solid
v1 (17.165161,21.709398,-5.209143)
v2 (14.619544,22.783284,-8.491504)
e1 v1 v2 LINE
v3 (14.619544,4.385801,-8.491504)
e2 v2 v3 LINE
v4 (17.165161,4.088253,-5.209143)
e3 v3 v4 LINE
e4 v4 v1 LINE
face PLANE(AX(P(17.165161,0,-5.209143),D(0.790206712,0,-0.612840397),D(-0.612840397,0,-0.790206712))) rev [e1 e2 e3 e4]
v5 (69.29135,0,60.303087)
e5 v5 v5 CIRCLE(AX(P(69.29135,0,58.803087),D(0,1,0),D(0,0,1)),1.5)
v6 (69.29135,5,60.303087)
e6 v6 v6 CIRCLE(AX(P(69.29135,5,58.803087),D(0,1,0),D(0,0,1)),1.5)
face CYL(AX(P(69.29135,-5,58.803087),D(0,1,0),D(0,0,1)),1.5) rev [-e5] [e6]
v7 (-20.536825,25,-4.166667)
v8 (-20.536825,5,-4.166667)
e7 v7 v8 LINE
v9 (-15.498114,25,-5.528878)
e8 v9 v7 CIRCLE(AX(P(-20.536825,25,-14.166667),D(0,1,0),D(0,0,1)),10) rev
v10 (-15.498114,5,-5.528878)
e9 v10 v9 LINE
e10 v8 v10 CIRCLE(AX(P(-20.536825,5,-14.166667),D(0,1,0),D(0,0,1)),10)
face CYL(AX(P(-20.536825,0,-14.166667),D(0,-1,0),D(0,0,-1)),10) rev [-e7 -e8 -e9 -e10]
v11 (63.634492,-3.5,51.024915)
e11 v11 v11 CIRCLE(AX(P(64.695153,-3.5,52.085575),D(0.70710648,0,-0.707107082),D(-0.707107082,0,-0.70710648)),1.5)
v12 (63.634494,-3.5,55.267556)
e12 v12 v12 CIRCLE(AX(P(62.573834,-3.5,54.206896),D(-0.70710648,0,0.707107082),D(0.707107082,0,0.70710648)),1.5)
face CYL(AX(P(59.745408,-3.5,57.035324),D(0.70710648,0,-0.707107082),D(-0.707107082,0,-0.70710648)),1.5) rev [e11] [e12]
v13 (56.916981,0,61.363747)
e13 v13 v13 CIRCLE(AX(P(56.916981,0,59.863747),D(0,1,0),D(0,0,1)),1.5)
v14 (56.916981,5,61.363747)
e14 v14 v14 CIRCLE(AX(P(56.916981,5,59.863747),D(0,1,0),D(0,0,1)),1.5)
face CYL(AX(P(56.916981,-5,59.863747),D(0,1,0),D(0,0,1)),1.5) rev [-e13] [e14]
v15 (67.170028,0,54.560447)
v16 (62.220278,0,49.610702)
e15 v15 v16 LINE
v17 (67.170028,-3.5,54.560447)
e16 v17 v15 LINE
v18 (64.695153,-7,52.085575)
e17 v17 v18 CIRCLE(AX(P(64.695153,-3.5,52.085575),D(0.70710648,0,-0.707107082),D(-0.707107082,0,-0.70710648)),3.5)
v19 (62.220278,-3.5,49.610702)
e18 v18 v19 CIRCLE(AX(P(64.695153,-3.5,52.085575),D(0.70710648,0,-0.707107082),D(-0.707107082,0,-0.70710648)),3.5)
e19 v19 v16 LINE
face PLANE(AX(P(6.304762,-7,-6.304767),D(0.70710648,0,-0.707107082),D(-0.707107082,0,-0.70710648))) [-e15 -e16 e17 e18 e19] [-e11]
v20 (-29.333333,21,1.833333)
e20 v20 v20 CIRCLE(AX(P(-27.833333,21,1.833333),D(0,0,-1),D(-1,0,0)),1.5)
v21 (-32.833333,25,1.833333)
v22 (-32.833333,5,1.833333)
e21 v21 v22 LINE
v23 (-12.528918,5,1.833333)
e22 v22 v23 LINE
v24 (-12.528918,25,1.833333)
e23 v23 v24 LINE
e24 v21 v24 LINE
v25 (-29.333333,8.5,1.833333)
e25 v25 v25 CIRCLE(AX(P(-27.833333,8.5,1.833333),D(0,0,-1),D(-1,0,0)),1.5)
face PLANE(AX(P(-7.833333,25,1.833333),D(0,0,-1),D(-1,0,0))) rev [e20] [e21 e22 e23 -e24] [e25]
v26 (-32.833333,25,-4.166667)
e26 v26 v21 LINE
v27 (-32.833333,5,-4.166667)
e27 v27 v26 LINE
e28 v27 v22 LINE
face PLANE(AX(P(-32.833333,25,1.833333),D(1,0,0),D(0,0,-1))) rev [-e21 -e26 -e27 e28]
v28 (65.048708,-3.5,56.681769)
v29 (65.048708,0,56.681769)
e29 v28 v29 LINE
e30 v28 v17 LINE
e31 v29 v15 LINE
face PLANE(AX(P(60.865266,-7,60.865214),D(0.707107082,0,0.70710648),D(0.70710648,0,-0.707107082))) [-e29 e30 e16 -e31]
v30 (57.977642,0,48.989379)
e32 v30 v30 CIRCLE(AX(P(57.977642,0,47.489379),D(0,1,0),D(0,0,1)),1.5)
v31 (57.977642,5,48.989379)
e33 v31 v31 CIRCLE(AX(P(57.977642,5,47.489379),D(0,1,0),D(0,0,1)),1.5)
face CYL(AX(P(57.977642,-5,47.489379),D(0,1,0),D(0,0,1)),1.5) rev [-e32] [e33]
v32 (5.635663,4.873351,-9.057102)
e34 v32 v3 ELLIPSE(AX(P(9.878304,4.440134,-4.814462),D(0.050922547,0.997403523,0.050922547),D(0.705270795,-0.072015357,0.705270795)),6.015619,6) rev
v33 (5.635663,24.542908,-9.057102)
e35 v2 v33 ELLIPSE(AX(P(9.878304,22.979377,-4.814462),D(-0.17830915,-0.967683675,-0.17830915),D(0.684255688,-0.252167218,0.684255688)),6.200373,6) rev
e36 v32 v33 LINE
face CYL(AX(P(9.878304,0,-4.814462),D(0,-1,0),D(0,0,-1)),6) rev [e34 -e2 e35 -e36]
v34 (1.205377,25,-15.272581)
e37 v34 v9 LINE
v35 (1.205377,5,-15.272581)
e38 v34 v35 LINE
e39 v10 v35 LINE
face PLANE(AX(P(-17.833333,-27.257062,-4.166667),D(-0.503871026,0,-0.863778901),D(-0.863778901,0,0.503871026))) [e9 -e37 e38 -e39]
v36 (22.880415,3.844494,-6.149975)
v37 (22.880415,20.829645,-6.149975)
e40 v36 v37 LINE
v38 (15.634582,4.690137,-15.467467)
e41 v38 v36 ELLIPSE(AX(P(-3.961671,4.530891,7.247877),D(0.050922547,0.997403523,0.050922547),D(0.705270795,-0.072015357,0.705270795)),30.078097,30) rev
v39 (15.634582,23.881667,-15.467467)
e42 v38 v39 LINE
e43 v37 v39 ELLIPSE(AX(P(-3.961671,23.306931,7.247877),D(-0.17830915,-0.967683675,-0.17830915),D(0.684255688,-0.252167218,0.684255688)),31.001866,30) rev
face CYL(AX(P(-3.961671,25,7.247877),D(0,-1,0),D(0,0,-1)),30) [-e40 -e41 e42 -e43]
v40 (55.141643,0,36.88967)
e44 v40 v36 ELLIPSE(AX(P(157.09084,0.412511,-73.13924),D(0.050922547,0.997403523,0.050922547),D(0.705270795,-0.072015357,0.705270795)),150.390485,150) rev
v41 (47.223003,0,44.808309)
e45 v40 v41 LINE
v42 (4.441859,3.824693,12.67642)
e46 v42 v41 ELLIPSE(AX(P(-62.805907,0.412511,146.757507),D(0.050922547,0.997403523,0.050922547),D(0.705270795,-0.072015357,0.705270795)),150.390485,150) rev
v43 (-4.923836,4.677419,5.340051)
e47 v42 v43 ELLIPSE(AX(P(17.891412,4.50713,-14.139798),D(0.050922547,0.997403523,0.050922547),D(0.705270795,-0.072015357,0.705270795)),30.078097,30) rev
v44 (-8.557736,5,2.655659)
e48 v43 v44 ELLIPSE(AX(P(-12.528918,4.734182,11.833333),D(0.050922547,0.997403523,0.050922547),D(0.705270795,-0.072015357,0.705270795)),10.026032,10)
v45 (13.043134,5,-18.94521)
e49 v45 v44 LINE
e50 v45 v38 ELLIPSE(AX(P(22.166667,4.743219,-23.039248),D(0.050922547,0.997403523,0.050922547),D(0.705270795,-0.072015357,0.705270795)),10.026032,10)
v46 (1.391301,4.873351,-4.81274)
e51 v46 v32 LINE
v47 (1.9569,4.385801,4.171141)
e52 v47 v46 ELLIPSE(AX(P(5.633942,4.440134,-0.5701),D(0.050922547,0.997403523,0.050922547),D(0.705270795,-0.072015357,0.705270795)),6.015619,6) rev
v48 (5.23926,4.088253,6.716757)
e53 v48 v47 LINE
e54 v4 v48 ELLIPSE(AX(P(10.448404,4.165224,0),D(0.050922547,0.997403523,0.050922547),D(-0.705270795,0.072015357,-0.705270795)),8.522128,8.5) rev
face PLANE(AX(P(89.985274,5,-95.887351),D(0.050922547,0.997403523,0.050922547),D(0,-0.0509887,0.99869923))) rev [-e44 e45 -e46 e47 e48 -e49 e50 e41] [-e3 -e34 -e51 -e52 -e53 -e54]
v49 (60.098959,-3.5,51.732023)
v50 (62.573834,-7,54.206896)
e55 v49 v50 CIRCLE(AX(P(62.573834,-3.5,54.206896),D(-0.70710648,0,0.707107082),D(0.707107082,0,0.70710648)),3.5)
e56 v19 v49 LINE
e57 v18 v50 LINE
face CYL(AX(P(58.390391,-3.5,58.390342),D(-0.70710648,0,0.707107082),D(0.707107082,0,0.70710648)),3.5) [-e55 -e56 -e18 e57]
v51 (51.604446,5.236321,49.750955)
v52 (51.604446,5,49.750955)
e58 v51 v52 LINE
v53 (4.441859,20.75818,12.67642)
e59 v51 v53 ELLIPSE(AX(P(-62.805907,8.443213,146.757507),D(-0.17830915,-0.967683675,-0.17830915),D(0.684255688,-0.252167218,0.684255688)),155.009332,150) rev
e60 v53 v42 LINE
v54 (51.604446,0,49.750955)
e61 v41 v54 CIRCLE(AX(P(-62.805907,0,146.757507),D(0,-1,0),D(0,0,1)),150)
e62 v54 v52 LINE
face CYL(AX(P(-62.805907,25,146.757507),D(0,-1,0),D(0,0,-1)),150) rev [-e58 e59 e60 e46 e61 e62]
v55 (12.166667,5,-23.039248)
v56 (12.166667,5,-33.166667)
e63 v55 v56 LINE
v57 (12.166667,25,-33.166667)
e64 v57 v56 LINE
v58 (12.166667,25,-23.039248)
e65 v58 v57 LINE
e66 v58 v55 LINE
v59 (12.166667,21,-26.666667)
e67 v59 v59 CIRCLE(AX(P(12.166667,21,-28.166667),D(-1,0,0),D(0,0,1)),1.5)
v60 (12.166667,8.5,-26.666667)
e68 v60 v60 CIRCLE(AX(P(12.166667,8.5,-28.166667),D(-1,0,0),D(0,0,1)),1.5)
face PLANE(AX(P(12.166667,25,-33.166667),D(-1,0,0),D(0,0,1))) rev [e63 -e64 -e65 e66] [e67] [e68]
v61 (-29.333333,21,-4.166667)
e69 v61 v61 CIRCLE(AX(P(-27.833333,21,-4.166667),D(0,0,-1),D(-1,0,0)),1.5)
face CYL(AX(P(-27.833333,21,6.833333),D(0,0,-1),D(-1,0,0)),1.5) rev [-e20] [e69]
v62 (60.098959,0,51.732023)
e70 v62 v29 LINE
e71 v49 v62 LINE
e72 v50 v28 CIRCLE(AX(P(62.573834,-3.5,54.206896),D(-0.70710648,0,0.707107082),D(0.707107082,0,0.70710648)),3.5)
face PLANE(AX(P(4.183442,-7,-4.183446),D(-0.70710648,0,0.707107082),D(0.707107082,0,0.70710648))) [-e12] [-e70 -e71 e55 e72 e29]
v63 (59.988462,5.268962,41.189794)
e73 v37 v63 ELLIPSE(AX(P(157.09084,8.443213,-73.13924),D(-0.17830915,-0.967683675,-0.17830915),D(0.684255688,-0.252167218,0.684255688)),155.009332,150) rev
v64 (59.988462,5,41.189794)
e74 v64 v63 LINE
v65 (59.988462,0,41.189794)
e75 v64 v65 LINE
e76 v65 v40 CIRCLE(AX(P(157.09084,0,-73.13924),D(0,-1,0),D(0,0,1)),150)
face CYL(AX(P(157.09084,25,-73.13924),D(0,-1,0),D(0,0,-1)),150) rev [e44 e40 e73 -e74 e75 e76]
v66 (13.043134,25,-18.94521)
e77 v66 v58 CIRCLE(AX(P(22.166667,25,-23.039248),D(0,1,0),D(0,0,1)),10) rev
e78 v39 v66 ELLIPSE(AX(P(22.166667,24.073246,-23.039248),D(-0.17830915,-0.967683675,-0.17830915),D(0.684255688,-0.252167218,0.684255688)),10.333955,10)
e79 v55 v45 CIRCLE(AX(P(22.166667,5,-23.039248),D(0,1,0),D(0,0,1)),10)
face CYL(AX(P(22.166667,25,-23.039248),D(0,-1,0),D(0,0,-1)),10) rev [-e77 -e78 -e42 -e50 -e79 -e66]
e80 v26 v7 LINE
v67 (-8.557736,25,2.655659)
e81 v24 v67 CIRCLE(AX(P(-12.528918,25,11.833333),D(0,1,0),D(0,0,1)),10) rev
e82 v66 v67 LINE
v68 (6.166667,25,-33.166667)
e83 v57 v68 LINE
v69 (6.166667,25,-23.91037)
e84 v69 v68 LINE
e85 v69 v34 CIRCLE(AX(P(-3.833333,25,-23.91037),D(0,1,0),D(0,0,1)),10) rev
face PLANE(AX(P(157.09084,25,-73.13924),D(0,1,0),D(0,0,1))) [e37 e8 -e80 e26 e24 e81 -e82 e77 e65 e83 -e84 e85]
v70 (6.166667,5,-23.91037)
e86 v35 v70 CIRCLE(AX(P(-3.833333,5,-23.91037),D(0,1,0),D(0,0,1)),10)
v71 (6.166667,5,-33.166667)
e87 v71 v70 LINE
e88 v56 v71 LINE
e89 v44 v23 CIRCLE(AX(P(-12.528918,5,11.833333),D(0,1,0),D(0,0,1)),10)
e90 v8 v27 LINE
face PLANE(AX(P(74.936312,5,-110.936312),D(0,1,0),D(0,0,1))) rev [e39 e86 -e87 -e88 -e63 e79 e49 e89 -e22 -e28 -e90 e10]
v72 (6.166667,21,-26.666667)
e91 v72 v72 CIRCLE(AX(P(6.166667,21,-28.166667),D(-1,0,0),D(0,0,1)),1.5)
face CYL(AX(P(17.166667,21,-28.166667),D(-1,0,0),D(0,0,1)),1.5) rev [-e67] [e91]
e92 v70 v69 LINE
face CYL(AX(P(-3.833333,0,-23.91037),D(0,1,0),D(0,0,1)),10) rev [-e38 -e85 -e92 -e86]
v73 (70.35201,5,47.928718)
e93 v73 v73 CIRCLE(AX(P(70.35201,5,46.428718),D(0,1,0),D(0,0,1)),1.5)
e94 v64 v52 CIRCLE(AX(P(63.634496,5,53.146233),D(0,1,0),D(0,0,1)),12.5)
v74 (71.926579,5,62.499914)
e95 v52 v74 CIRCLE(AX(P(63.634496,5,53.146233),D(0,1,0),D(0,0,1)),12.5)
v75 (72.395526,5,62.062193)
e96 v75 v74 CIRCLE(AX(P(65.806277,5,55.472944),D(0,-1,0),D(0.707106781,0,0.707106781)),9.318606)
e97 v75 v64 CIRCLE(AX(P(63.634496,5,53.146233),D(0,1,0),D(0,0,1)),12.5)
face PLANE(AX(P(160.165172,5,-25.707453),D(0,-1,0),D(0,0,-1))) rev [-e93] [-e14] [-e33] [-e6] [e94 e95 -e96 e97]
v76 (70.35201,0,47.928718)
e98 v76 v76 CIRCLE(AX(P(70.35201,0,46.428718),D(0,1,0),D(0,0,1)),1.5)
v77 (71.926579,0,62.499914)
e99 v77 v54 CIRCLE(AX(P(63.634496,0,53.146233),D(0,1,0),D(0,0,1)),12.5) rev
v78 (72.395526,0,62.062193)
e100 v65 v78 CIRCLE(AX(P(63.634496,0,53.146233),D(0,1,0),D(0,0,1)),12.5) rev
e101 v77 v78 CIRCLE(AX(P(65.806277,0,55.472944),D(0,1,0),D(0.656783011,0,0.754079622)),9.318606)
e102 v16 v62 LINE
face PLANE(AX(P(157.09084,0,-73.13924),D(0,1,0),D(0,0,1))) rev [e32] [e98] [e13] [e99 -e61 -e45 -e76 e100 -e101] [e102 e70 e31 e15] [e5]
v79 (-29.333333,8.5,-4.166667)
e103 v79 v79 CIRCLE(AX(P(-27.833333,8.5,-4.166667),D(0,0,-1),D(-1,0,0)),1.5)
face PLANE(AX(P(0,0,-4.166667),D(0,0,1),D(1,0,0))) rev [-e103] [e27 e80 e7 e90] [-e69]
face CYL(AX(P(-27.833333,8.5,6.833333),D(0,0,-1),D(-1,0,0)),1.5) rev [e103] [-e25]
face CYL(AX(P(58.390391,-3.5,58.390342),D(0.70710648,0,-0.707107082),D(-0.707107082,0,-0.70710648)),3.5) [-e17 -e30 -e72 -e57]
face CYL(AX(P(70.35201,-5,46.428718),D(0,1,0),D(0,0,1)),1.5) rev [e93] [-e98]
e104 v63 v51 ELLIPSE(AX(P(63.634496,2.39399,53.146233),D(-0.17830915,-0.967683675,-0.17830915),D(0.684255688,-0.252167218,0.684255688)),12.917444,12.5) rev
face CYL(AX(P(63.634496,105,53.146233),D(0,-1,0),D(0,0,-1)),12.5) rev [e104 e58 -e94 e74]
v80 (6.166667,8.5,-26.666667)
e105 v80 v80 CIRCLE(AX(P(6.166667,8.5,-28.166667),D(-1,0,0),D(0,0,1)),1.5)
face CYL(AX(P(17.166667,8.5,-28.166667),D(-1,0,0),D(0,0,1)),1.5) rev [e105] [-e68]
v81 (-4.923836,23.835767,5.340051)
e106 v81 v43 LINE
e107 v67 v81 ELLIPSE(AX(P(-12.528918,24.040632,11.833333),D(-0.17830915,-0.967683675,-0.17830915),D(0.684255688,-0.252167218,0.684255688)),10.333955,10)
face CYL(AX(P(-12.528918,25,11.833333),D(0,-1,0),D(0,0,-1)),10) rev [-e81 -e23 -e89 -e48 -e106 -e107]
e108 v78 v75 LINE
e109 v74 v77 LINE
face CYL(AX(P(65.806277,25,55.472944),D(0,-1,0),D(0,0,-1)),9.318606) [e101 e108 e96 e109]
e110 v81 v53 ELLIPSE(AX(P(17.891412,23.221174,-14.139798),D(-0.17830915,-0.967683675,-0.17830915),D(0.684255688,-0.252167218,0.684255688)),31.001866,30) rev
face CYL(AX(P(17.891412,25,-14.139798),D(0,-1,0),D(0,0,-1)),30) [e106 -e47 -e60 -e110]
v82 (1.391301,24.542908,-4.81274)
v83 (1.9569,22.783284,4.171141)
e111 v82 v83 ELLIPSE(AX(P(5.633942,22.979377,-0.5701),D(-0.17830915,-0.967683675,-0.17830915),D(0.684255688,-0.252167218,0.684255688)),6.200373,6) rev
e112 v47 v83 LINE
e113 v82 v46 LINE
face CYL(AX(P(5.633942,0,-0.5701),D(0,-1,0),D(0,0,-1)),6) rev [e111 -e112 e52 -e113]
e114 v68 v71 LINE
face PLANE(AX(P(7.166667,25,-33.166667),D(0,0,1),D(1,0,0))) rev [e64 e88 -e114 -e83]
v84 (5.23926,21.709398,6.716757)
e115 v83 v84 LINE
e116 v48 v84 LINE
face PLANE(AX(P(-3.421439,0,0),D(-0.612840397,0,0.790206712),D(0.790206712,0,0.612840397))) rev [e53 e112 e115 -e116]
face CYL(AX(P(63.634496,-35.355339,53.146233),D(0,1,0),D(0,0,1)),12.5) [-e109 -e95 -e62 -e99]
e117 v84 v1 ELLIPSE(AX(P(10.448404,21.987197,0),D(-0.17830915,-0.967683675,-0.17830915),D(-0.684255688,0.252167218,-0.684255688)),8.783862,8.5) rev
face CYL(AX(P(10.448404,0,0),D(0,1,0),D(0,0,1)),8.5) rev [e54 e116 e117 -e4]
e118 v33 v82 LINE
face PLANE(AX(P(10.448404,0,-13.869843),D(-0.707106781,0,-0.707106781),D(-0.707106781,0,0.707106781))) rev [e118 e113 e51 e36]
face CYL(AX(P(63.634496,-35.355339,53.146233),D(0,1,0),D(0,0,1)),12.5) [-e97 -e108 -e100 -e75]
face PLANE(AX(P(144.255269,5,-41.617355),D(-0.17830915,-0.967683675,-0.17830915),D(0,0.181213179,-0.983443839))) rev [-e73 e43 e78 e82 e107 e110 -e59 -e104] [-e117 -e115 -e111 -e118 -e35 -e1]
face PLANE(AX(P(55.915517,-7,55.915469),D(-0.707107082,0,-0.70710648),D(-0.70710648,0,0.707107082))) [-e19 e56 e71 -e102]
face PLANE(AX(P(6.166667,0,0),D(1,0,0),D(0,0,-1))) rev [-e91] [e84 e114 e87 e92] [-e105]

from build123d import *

# Parameters (mm, degrees)
BOSS_EXTRUDE3_DEPTH     = 25
FILLET2_R               = 30
CUT_EXTRUDE4_DEPTH      = 25
FILLET3_R               = 6
BOSS_EXTRUDE4_DEPTH     = 25
CUT_EXTRUDE6_DEPTH      = 100
CUT_EXTRUDE6_DEPTH_BACK = 100
SKETCH10_W              = 160.183879056
SKETCH10_H              = 83.114276869
SKETCH11_R              = 12.5
BOSS_EXTRUDE5_DEPTH     = 5
CUT_EXTRUDE7_START      = 100
SKETCH12_R              = 12.5
CUT_EXTRUDE7_DEPTH      = 100
SKETCH14_R              = 1.5
CUT_EXTRUDE8_DEPTH      = 10
SKETCH15_R              = 1.5
CUT_EXTRUDE9_DEPTH      = 10
FILLET6_R               = 10
SKETCH16_R              = 1.5
CUT_EXTRUDE10_DEPTH     = 10
BOSS_EXTRUDE7_DEPTH     = 7
SKETCH19_R              = 1.5
CUT_EXTRUDE12_DEPTH     = 7
FILLET7_R               = 3.5
BOSS_EXTRUDE8_START     = 1
SKETCH20_W              = 15
SKETCH20_H              = 20
SKETCH20_R              = 1.5
BOSS_EXTRUDE8_DEPTH     = 1
BOSS_EXTRUDE9_START     = 1
SKETCH21_W              = 15
SKETCH21_H              = 20
SKETCH21_R              = 1.5
BOSS_EXTRUDE9_DEPTH     = 1
BOSS_EXTRUDE10_DEPTH    = 20
FILLET8_R               = 10


# Some blends are built 0.0001 mm under size
with BuildPart() as part:
    # Sketch1 → Boss-Extrude3 (new body)
    with BuildSketch(Plane(origin=(0, 0, 0), x_dir=(1, 0, 0), z_dir=(0, 1, 0))):
        with BuildLine():
            Line((-32.833333333, 3.166666667), (-17.833333333, 3.166666667))
            Line((-17.833333333, 3.166666667), (7.166666667, 18.166666667))
            Line((7.166666667, 18.166666667), (7.166666667, 33.166666667))
            Line((7.166666667, 33.166666667), (12.166666667, 33.166666667))
            Line((12.166666667, 33.166666667), (12.166666667, 18.166666667))
            Line((12.166666667, 18.166666667), (17.527177031, 18.166666667))
            ThreePointArc((17.527177031, 18.166666667), (37.442198793, -17.327342211), (66.165661867, -46.161270611))
            ThreePointArc((66.165661867, -46.161270611), (72.395526252, -62.062192918), (56.494603945, -55.832328533))
            ThreePointArc((56.494603945, -55.832328533), (27.660675544, -27.10886546), (-7.833333333, -7.193843698))
            Line((-7.833333333, -7.193843698), (-7.833333333, -1.833333333))
            Line((-7.833333333, -1.833333333), (-32.833333333, -1.833333333))
            Line((-32.833333333, -1.833333333), (-32.833333333, 3.166666667))
        make_face()
    extrude(amount=BOSS_EXTRUDE3_DEPTH)

    # Chamfer2
    # the kernel refuses this chamfer: 6, 5.627229018 mm, written as the material it takes off along each edge
    with BuildSketch(Plane(origin=(17.527177031, -14.820831596, -18.166666667), x_dir=(-0.9997164223008481, 0, -0.023813336221376217), z_dir=(0, 1, 0))) as chamfer2_piece_1_section:
        with BuildLine():
            Line((5.702702936, 0), (-2.525905891, 5.363294445))
            Line((-2.525905891, 5.363294445), (-2.634618021, 5.31248428))
            ThreePointArc((-2.634618021, 5.31248428), (-1.288030314, 2.670484416), (-0.110572005, -0.046624369))
            Line((-0.110572005, -0.046624369), (0.0028576, -0.119965971))
            ThreePointArc((0.0028576, -0.119965971), (2.852592138, -0.052085034), (5.705560536, -0.119965971))
            Line((5.705560536, -0.119965971), (5.702702936, 0))
        make_face()
    chamfer2_piece_1 = extrude(amount=54.641663192, mode=Mode.PRIVATE)
    chamfer2_piece_1 = split(chamfer2_piece_1, bisect_by=Plane(origin=(12.166666667, 12.5, -16.425975933), z_dir=(1, 0, 0)), keep=Keep.TOP, mode=Mode.PRIVATE)
    add(chamfer2_piece_1, mode=Mode.SUBTRACT)
    with BuildSketch(Plane(origin=(-7.833333333, -15.240510768, 7.193843698), x_dir=(-0.020819858729133396, 0, -0.999783243249505), z_dir=(0, 1, 0))) as chamfer2_piece_2_section:
        with BuildLine():
            Line((6.096204307, 0), (-2.361428154, -5.028621182))
            Line((-2.361428154, -5.028621182), (-2.470415157, -4.978403325))
            ThreePointArc((-2.470415157, -4.978403325), (-1.204815622, -2.503704319), (-0.110711113, 0.046293083))
            Line((-0.110711113, 0.046293083), (0.002498383, 0.119973989))
            ThreePointArc((0.002498383, 0.119973989), (3.049279286, 0.056526689), (6.09870269, 0.119973989))
            Line((6.09870269, 0.119973989), (6.096204307, 0))
        make_face()
    chamfer2_piece_2 = extrude(amount=55.481021536, mode=Mode.PRIVATE)
    chamfer2_piece_2 = split(chamfer2_piece_2, bisect_by=Plane(origin=(-6.193350631, 12.5, 1.833333333), z_dir=(0, 0, 1)), keep=Keep.TOP, mode=Mode.PRIVATE)
    add(chamfer2_piece_2, mode=Mode.SUBTRACT)

    # Fillet2
    # the kernel refuses this fillet: 30 mm, written as the material it takes off along each edge
    with BuildSketch(Plane(origin=(19.726764246, 45.355475944, -12.880543269), x_dir=(0.42429011681478046, 0, 0.9055263092662189), z_dir=(0, -1, 0))) as fillet2_piece_1:
        with BuildLine():
            CenterArc((8.176045785, 29.990790911), FILLET2_R, 239.5660286, 29.014271836)
            Line((-7.020306331, 4.124386399), (0, 0))
            ThreePointArc((0, 0), (3.716384448, 0.046045445), (7.432768895, 0))
        make_face()
    extrude(amount=65.710951888, mode=Mode.SUBTRACT)
    with BuildSketch(Plane(origin=(-2.883559651, 47.152983024, 9.246371963), x_dir=(0.9056360428972143, 0, 0.4240558427913414), z_dir=(0, -1, 0))) as fillet2_piece_2_section:
        with BuildLine():
            CenterArc((8.898038247, -29.989092358), FILLET2_R, 91.545096469, 31.436731661)
            Line((-7.433152225, -4.823794471), (0, 0))
            ThreePointArc((0, 0), (4.044562839, -0.05453821), (8.089125679, 0))
        make_face()
    fillet2_piece_2 = extrude(amount=69.305966049, mode=Mode.PRIVATE)
    fillet2_piece_2 = split(fillet2_piece_2, bisect_by=Plane(origin=(-2.472074329, 12.5, 1.833333333), z_dir=(0, 0, 1)), keep=Keep.TOP, mode=Mode.PRIVATE)
    add(fillet2_piece_2, mode=Mode.SUBTRACT)

    # Sketch4 → Cut-Extrude4 (cut)
    with BuildSketch(Plane(origin=(0, 25, 0), x_dir=(1, 0, 0), z_dir=(0, 1, 0))):
        with BuildLine():
            Line((17.165160832, 5.209143376), (10.448403781, 13.869842848))
            Line((10.448403781, 13.869842848), (-3.421439067, 0))
            Line((-3.421439067, 0), (5.239260404, -6.716757051))
            ThreePointArc((5.239260404, -6.716757051), (16.458811421, -6.01040764), (17.165160832, 5.209143376))
        make_face()
    extrude(amount=-CUT_EXTRUDE4_DEPTH, mode=Mode.SUBTRACT)

    # Fillet3
    fillet3_edges = [part.edges().sort_by_distance(p)[0] for p in [
        (-3.421439067, 12.5, 0),
        (10.448403781, 12.5, -13.869842848),
    ]]
    fillet(fillet3_edges, radius=FILLET3_R)

    # Sketch7 → Boss-Extrude4 (add)
    with BuildSketch(Plane(origin=(0, 25, 0), x_dir=(1, 0, 0), z_dir=(0, 1, 0))):
        Polygon((8.953526914, 27.464178608), (42.758807377, -6.341101855), (46.775588972, -2.324320261), (12.970308509, 31.480960203), align=None)
    extrude(amount=BOSS_EXTRUDE4_DEPTH)

    # Sketch10 → Cut-Extrude6 (cut, two sides: drawn at the far end of the back side and taken through both)
    with BuildSketch(Plane(origin=(22.225634356, 0, -22.225634356), x_dir=(-0.7071067811865475, 0, -0.7071067811865477), z_dir=(0.7071067811865477, 0, -0.7071067811865475)).offset(-CUT_EXTRUDE6_DEPTH_BACK)):
        with Locations((-36.711585848, 10.87638512)):
            Rectangle(SKETCH10_W, SKETCH10_H)
        Polygon((-95.075965008, 0), (-95.075965008, 5), (-72.575965008, 5), (4.173398499, 25), (18.384776311, 25), (25.455844123, 25), (25.455844123, 5), (18.384776311, 5), (4.173398499, 5), (-65.075965008, 0), align=None, mode=Mode.SUBTRACT)
    extrude(amount=CUT_EXTRUDE6_DEPTH + CUT_EXTRUDE6_DEPTH_BACK, mode=Mode.SUBTRACT)

    # Sketch11 → Boss-Extrude5 (add)
    with BuildSketch(Plane(origin=(0, 5, 0), x_dir=(1, 0, 0), z_dir=(0, 1, 0))):
        with Locations((63.634495769, -53.146232797)):
            Circle(SKETCH11_R)
    extrude(amount=-BOSS_EXTRUDE5_DEPTH)

    # Sketch12 → Cut-Extrude7 (cut)
    with BuildSketch(Plane(origin=(0, 5, 0), x_dir=(1, 0, 0), z_dir=(0, 1, 0)).offset(CUT_EXTRUDE7_START)):
        with Locations((63.634495769, -53.146232797)):
            Circle(SKETCH12_R)
    extrude(amount=-CUT_EXTRUDE7_DEPTH, mode=Mode.SUBTRACT)

    # Sketch14 → Cut-Extrude8 (cut)
    with BuildSketch(Plane.ZY.offset(-7.166666667)):
        with Locations((-28.166666667, 21)):
            Circle(SKETCH14_R)
        with Locations((-28.166666667, 8.5)):
            Circle(SKETCH14_R)
    extrude(amount=-CUT_EXTRUDE8_DEPTH, mode=Mode.SUBTRACT)

    # Sketch15 → Cut-Extrude9 (cut)
    with BuildSketch(Plane(origin=(0, 0, -3.166666667), x_dir=(-1, 0, 0), z_dir=(0, 0, -1))):
        with Locations((27.833333333, 21)):
            Circle(SKETCH15_R)
        with Locations((27.833333333, 8.5)):
            Circle(SKETCH15_R)
    extrude(amount=-CUT_EXTRUDE9_DEPTH, mode=Mode.SUBTRACT)

    # Fillet6
    # the kernel refuses this fillet: 10 mm, written as the material it adds along each edge
    with BuildSketch(Plane(origin=(-7.502347281, -7.577664342, 1.833333333), x_dir=(0.5924373658705074, 0, 0.8056165139322894), z_dir=(0, 1, 0))) as fillet6_piece_1_section:
        with BuildLine():
            CenterArc((5.078393583, -9.973648871), FILLET6_R, 94.160376696, 49.509460781)
            Line((-2.977771557, -4.049275213), (0, 0))
            ThreePointArc((0, 0), (2.176454393, -0.079053386), (4.352908785, 0))
        make_face()
    fillet6_piece_1 = extrude(amount=45.100484579, mode=Mode.PRIVATE)
    fillet6_piece_1 = split(fillet6_piece_1, bisect_by=Plane(origin=(-10.464404815, 5.138408988, 1.851355811), z_dir=(-0.05092254709852862, -0.9974035233515051, -0.05092254709852862)), keep=Keep.TOP, mode=Mode.PRIVATE)
    fillet6_piece_1 = split(fillet6_piece_1, bisect_by=Plane(origin=(-10.467928872, 5, 1.847831753), z_dir=(0, 1, 0)), keep=Keep.TOP, mode=Mode.PRIVATE)
    add(fillet6_piece_1)
    with BuildSketch(Plane(origin=(-7.502347281, -7.577664342, 1.833333333), x_dir=(0.5924373658705074, 0, 0.8056165139322894), z_dir=(0, 1, 0))) as fillet6_piece_2_section:
        with BuildLine():
            CenterArc((5.078393583, -9.973648871), FILLET6_R, 94.160376696, 49.509460781)
            Line((-2.977771557, -4.049275213), (0, 0))
            ThreePointArc((0, 0), (2.176454393, -0.079053386), (4.352908785, 0))
        make_face()
    fillet6_piece_2 = extrude(amount=45.100484579, mode=Mode.PRIVATE)
    fillet6_piece_2 = split(fillet6_piece_2, bisect_by=Plane(origin=(-6.303814001, 4.830696636, 3.717827688), z_dir=(0.05092254709852862, 0.9974035233515051, 0.05092254709852862)), keep=Keep.TOP, mode=Mode.PRIVATE)
    fillet6_piece_2 = split(fillet6_piece_2, bisect_by=Plane(origin=(-6.299503336, 5, 3.722138352), z_dir=(0, -1, 0)), keep=Keep.TOP, mode=Mode.PRIVATE)
    add(fillet6_piece_2)
    with BuildSketch(Plane(origin=(-7.502347281, -7.577664342, 1.833333333), x_dir=(0.5924373658705074, 0, 0.8056165139322894), z_dir=(0, 1, 0))) as fillet6_piece_3_section:
        with BuildLine():
            CenterArc((5.078393583, -9.973648871), FILLET6_R, 94.160376696, 49.509460781)
            Line((-2.977771557, -4.049275213), (0, 0))
            ThreePointArc((0, 0), (2.176454393, -0.079053386), (4.352908785, 0))
        make_face()
    fillet6_piece_3 = extrude(amount=45.100484579, mode=Mode.PRIVATE)
    fillet6_piece_3 = split(fillet6_piece_3, bisect_by=Plane(origin=(-8.64759618, 5.034829767, 2.063320006), z_dir=(0.05092254709852862, 0.9974035233515051, 0.05092254709852862)), keep=Keep.TOP, mode=Mode.PRIVATE)
    fillet6_piece_3 = split(fillet6_piece_3, bisect_by=Plane(origin=(-6.413698514, 24.302451402, 4.297217673), z_dir=(-0.17830914996233782, -0.9676836745958967, -0.17830914996233793)), keep=Keep.TOP, mode=Mode.PRIVATE)
    fillet6_piece_3 = split(fillet6_piece_3, bisect_by=Plane(origin=(-8.143046579, 5, 2.567869607), z_dir=(0, 1, 0)), keep=Keep.TOP, mode=Mode.PRIVATE)
    fillet6_piece_3 = split(fillet6_piece_3, bisect_by=Plane(origin=(-8.143046579, 25, 2.567869607), z_dir=(0, -1, 0)), keep=Keep.TOP, mode=Mode.PRIVATE)
    add(fillet6_piece_3)
    with BuildSketch(Plane(origin=(12.166666667, 25, -18.068743425), x_dir=(0.7999623849439977, 0, 0.6000501501330627), z_dir=(0, -1, 0))) as fillet6_piece_4_section:
        with BuildLine():
            CenterArc((5.017071581, -9.976718531), FILLET6_R, 93.910453362, 49.216057169)
            Line((-2.982552268, -3.97621703), (-3.782514653, -3.37616688))
            Line((-3.782514653, -3.37616688), (-0.799962385, 0.60005015))
            Line((-0.799962385, 0.60005015), (0.042105821, 0.999113157))
            ThreePointArc((0.042105821, 0.999113157), (1.068110264, 0.955874051), (4.266901142, 0.997671853))
            Line((4.266901142, 0.997671853), (4.335098455, 0))
        make_face()
    fillet6_piece_4 = extrude(amount=20, mode=Mode.PRIVATE)
    fillet6_piece_4 = split(fillet6_piece_4, bisect_by=Plane(origin=(12.113566037, 5.056431477, -19.120947952), z_dir=(0.05092254709852862, 0.9974035233515051, 0.05092254709852862)), keep=Keep.TOP, mode=Mode.PRIVATE)
    fillet6_piece_4 = split(fillet6_piece_4, bisect_by=Plane(origin=(14.359334309, 24.376039861, -16.875179681), z_dir=(-0.17830914996233782, -0.9676836745958967, -0.17830914996233793)), keep=Keep.TOP, mode=Mode.PRIVATE)
    add(fillet6_piece_4)
    with BuildSketch(Plane(origin=(12.166666667, 25, -18.068743425), x_dir=(0.7999623849439977, 0, 0.6000501501330627), z_dir=(0, -1, 0))) as fillet6_piece_5_section:
        with BuildLine():
            CenterArc((5.017071581, -9.976718531), FILLET6_R, 93.910453362, 49.216057169)
            Line((-2.982552268, -3.97621703), (-3.782514653, -3.37616688))
            Line((-3.782514653, -3.37616688), (-0.799962385, 0.60005015))
            Line((-0.799962385, 0.60005015), (0.042105821, 0.999113157))
            ThreePointArc((0.042105821, 0.999113157), (1.068110264, 0.955874051), (4.266901142, 0.997671853))
            Line((4.266901142, 0.997671853), (4.335098455, 0))
        make_face()
    fillet6_piece_5 = extrude(amount=20, mode=Mode.PRIVATE)
    fillet6_piece_5 = split(fillet6_piece_5, bisect_by=Plane(origin=(11.727300312, 5.177477113, -21.105564102), z_dir=(-0.05092254709852862, -0.9974035233515051, -0.05092254709852862)), keep=Keep.TOP, mode=Mode.PRIVATE)
    add(fillet6_piece_5)
    with BuildSketch(Plane(origin=(12.166666667, 25, -18.068743425), x_dir=(0.7999623849439977, 0, 0.6000501501330627), z_dir=(0, -1, 0))) as fillet6_piece_6_section:
        with BuildLine():
            CenterArc((5.017071581, -9.976718531), FILLET6_R, 93.910453362, 49.216057169)
            Line((-2.982552268, -3.97621703), (-3.782514653, -3.37616688))
            Line((-3.782514653, -3.37616688), (-0.799962385, 0.60005015))
            Line((-0.799962385, 0.60005015), (0.042105821, 0.999113157))
            ThreePointArc((0.042105821, 0.999113157), (1.068110264, 0.955874051), (4.266901142, 0.997671853))
            Line((4.266901142, 0.997671853), (4.335098455, 0))
        make_face()
    fillet6_piece_6 = extrude(amount=32.426262487, mode=Mode.PRIVATE)
    fillet6_piece_6 = split(fillet6_piece_6, bisect_by=Plane(origin=(14.095782292, 4.806456237, -16.206979714), z_dir=(0.05092254709852862, 0.9974035233515051, 0.05092254709852862)), keep=Keep.TOP, mode=Mode.PRIVATE)
    fillet6_piece_6 = split(fillet6_piece_6, bisect_by=Plane(origin=(14.100710146, 5, -16.20205186), z_dir=(0, -1, 0)), keep=Keep.TOP, mode=Mode.PRIVATE)
    add(fillet6_piece_6)

    # Sketch16 → Cut-Extrude10 (cut)
    with BuildSketch(Plane(origin=(0, 5, 0), x_dir=(1, 0, 0), z_dir=(0, 1, 0))):
        with Locations(Location((70.35201019, -46.428718376, 0), (0, 0, 270))):
            Circle(SKETCH16_R)
        with Locations(Location((57.97764152, -47.489378547, 0), (0, 0, 270))):
            Circle(SKETCH16_R)
        with Locations(Location((56.916981348, -59.863747218, 0), (0, 0, 270))):
            Circle(SKETCH16_R)
        with Locations(Location((69.291350019, -58.803087046, 0), (0, 0, 270))):
            Circle(SKETCH16_R)
    extrude(amount=-CUT_EXTRUDE10_DEPTH, mode=Mode.SUBTRACT)

    # Sketch17 → Boss-Extrude7 (add)
    with BuildSketch(Plane.XZ):
        Polygon((65.048708428, 56.68176851), (67.170027868, 54.560447263), (62.220278291, 49.610701903), (60.098958851, 51.73202315), align=None)
    extrude(amount=BOSS_EXTRUDE7_DEPTH)

    # Sketch19 → Cut-Extrude12 (cut)
    with BuildSketch(Plane(origin=(6.304761689, 0, -6.304767061), x_dir=(-0.7071070824005901, 0, -0.7071064799723766), z_dir=(0.7071064799723766, 0, -0.7071070824005901))):
        with Locations((-82.57644824, -3.5)):
            Circle(SKETCH19_R)
    extrude(amount=-CUT_EXTRUDE12_DEPTH, mode=Mode.SUBTRACT)

    # Fillet7
    fillet7_edges = [part.edges().sort_by_distance(p)[0] for p in [
        (61.159618571, -7, 50.671362527),
        (66.109368148, -7, 55.621107886),
    ]]
    fillet(fillet7_edges, radius=FILLET7_R - 0.0001)  # a hair under: the kernel refuses the full size

    # Sketch20 → Boss-Extrude8 (add)
    with BuildSketch(Plane.ZY.offset(-7.166666667).offset(BOSS_EXTRUDE8_START)):
        with Locations((-25.666666667, 15)):
            Rectangle(SKETCH20_W, SKETCH20_H)
        with Locations((-28.166666667, 21)):
            Circle(SKETCH20_R, mode=Mode.SUBTRACT)
        with Locations((-28.166666667, 8.5)):
            Circle(SKETCH20_R, mode=Mode.SUBTRACT)
    extrude(amount=-BOSS_EXTRUDE8_DEPTH)

    # Sketch21 → Boss-Extrude9 (add)
    with BuildSketch(Plane(origin=(0, 0, -3.166666667), x_dir=(-1, 0, 0), z_dir=(0, 0, -1)).offset(BOSS_EXTRUDE9_START)):
        with Locations((25.333333333, 15)):
            Rectangle(SKETCH21_W, SKETCH21_H)
        with Locations((27.833333333, 21)):
            Circle(SKETCH21_R, mode=Mode.SUBTRACT)
        with Locations((27.833333333, 8.5)):
            Circle(SKETCH21_R, mode=Mode.SUBTRACT)
    extrude(amount=-BOSS_EXTRUDE9_DEPTH)

    # Sketch22 → Boss-Extrude10 (add)
    with BuildSketch(Plane(origin=(0, 25, 0), x_dir=(1, 0, 0), z_dir=(0, 1, 0))):
        Polygon((-17.833333333, 4.166666667), (6.166666667, 18.166666667), (7.166666667, 18.166666667), (-16.710835108, 1.271788267), (-20.312073149, 2.433477958), align=None)
    extrude(amount=-BOSS_EXTRUDE10_DEPTH)

    # Fillet8
    fillet8_edges = [part.edges().sort_by_distance(p)[0] for p in [
        (6.166666667, 15, -18.166666667),
        (-17.833333333, 15, -4.166666667),
    ]]
    fillet(fillet8_edges, radius=FILLET8_R)


solid = part.part
